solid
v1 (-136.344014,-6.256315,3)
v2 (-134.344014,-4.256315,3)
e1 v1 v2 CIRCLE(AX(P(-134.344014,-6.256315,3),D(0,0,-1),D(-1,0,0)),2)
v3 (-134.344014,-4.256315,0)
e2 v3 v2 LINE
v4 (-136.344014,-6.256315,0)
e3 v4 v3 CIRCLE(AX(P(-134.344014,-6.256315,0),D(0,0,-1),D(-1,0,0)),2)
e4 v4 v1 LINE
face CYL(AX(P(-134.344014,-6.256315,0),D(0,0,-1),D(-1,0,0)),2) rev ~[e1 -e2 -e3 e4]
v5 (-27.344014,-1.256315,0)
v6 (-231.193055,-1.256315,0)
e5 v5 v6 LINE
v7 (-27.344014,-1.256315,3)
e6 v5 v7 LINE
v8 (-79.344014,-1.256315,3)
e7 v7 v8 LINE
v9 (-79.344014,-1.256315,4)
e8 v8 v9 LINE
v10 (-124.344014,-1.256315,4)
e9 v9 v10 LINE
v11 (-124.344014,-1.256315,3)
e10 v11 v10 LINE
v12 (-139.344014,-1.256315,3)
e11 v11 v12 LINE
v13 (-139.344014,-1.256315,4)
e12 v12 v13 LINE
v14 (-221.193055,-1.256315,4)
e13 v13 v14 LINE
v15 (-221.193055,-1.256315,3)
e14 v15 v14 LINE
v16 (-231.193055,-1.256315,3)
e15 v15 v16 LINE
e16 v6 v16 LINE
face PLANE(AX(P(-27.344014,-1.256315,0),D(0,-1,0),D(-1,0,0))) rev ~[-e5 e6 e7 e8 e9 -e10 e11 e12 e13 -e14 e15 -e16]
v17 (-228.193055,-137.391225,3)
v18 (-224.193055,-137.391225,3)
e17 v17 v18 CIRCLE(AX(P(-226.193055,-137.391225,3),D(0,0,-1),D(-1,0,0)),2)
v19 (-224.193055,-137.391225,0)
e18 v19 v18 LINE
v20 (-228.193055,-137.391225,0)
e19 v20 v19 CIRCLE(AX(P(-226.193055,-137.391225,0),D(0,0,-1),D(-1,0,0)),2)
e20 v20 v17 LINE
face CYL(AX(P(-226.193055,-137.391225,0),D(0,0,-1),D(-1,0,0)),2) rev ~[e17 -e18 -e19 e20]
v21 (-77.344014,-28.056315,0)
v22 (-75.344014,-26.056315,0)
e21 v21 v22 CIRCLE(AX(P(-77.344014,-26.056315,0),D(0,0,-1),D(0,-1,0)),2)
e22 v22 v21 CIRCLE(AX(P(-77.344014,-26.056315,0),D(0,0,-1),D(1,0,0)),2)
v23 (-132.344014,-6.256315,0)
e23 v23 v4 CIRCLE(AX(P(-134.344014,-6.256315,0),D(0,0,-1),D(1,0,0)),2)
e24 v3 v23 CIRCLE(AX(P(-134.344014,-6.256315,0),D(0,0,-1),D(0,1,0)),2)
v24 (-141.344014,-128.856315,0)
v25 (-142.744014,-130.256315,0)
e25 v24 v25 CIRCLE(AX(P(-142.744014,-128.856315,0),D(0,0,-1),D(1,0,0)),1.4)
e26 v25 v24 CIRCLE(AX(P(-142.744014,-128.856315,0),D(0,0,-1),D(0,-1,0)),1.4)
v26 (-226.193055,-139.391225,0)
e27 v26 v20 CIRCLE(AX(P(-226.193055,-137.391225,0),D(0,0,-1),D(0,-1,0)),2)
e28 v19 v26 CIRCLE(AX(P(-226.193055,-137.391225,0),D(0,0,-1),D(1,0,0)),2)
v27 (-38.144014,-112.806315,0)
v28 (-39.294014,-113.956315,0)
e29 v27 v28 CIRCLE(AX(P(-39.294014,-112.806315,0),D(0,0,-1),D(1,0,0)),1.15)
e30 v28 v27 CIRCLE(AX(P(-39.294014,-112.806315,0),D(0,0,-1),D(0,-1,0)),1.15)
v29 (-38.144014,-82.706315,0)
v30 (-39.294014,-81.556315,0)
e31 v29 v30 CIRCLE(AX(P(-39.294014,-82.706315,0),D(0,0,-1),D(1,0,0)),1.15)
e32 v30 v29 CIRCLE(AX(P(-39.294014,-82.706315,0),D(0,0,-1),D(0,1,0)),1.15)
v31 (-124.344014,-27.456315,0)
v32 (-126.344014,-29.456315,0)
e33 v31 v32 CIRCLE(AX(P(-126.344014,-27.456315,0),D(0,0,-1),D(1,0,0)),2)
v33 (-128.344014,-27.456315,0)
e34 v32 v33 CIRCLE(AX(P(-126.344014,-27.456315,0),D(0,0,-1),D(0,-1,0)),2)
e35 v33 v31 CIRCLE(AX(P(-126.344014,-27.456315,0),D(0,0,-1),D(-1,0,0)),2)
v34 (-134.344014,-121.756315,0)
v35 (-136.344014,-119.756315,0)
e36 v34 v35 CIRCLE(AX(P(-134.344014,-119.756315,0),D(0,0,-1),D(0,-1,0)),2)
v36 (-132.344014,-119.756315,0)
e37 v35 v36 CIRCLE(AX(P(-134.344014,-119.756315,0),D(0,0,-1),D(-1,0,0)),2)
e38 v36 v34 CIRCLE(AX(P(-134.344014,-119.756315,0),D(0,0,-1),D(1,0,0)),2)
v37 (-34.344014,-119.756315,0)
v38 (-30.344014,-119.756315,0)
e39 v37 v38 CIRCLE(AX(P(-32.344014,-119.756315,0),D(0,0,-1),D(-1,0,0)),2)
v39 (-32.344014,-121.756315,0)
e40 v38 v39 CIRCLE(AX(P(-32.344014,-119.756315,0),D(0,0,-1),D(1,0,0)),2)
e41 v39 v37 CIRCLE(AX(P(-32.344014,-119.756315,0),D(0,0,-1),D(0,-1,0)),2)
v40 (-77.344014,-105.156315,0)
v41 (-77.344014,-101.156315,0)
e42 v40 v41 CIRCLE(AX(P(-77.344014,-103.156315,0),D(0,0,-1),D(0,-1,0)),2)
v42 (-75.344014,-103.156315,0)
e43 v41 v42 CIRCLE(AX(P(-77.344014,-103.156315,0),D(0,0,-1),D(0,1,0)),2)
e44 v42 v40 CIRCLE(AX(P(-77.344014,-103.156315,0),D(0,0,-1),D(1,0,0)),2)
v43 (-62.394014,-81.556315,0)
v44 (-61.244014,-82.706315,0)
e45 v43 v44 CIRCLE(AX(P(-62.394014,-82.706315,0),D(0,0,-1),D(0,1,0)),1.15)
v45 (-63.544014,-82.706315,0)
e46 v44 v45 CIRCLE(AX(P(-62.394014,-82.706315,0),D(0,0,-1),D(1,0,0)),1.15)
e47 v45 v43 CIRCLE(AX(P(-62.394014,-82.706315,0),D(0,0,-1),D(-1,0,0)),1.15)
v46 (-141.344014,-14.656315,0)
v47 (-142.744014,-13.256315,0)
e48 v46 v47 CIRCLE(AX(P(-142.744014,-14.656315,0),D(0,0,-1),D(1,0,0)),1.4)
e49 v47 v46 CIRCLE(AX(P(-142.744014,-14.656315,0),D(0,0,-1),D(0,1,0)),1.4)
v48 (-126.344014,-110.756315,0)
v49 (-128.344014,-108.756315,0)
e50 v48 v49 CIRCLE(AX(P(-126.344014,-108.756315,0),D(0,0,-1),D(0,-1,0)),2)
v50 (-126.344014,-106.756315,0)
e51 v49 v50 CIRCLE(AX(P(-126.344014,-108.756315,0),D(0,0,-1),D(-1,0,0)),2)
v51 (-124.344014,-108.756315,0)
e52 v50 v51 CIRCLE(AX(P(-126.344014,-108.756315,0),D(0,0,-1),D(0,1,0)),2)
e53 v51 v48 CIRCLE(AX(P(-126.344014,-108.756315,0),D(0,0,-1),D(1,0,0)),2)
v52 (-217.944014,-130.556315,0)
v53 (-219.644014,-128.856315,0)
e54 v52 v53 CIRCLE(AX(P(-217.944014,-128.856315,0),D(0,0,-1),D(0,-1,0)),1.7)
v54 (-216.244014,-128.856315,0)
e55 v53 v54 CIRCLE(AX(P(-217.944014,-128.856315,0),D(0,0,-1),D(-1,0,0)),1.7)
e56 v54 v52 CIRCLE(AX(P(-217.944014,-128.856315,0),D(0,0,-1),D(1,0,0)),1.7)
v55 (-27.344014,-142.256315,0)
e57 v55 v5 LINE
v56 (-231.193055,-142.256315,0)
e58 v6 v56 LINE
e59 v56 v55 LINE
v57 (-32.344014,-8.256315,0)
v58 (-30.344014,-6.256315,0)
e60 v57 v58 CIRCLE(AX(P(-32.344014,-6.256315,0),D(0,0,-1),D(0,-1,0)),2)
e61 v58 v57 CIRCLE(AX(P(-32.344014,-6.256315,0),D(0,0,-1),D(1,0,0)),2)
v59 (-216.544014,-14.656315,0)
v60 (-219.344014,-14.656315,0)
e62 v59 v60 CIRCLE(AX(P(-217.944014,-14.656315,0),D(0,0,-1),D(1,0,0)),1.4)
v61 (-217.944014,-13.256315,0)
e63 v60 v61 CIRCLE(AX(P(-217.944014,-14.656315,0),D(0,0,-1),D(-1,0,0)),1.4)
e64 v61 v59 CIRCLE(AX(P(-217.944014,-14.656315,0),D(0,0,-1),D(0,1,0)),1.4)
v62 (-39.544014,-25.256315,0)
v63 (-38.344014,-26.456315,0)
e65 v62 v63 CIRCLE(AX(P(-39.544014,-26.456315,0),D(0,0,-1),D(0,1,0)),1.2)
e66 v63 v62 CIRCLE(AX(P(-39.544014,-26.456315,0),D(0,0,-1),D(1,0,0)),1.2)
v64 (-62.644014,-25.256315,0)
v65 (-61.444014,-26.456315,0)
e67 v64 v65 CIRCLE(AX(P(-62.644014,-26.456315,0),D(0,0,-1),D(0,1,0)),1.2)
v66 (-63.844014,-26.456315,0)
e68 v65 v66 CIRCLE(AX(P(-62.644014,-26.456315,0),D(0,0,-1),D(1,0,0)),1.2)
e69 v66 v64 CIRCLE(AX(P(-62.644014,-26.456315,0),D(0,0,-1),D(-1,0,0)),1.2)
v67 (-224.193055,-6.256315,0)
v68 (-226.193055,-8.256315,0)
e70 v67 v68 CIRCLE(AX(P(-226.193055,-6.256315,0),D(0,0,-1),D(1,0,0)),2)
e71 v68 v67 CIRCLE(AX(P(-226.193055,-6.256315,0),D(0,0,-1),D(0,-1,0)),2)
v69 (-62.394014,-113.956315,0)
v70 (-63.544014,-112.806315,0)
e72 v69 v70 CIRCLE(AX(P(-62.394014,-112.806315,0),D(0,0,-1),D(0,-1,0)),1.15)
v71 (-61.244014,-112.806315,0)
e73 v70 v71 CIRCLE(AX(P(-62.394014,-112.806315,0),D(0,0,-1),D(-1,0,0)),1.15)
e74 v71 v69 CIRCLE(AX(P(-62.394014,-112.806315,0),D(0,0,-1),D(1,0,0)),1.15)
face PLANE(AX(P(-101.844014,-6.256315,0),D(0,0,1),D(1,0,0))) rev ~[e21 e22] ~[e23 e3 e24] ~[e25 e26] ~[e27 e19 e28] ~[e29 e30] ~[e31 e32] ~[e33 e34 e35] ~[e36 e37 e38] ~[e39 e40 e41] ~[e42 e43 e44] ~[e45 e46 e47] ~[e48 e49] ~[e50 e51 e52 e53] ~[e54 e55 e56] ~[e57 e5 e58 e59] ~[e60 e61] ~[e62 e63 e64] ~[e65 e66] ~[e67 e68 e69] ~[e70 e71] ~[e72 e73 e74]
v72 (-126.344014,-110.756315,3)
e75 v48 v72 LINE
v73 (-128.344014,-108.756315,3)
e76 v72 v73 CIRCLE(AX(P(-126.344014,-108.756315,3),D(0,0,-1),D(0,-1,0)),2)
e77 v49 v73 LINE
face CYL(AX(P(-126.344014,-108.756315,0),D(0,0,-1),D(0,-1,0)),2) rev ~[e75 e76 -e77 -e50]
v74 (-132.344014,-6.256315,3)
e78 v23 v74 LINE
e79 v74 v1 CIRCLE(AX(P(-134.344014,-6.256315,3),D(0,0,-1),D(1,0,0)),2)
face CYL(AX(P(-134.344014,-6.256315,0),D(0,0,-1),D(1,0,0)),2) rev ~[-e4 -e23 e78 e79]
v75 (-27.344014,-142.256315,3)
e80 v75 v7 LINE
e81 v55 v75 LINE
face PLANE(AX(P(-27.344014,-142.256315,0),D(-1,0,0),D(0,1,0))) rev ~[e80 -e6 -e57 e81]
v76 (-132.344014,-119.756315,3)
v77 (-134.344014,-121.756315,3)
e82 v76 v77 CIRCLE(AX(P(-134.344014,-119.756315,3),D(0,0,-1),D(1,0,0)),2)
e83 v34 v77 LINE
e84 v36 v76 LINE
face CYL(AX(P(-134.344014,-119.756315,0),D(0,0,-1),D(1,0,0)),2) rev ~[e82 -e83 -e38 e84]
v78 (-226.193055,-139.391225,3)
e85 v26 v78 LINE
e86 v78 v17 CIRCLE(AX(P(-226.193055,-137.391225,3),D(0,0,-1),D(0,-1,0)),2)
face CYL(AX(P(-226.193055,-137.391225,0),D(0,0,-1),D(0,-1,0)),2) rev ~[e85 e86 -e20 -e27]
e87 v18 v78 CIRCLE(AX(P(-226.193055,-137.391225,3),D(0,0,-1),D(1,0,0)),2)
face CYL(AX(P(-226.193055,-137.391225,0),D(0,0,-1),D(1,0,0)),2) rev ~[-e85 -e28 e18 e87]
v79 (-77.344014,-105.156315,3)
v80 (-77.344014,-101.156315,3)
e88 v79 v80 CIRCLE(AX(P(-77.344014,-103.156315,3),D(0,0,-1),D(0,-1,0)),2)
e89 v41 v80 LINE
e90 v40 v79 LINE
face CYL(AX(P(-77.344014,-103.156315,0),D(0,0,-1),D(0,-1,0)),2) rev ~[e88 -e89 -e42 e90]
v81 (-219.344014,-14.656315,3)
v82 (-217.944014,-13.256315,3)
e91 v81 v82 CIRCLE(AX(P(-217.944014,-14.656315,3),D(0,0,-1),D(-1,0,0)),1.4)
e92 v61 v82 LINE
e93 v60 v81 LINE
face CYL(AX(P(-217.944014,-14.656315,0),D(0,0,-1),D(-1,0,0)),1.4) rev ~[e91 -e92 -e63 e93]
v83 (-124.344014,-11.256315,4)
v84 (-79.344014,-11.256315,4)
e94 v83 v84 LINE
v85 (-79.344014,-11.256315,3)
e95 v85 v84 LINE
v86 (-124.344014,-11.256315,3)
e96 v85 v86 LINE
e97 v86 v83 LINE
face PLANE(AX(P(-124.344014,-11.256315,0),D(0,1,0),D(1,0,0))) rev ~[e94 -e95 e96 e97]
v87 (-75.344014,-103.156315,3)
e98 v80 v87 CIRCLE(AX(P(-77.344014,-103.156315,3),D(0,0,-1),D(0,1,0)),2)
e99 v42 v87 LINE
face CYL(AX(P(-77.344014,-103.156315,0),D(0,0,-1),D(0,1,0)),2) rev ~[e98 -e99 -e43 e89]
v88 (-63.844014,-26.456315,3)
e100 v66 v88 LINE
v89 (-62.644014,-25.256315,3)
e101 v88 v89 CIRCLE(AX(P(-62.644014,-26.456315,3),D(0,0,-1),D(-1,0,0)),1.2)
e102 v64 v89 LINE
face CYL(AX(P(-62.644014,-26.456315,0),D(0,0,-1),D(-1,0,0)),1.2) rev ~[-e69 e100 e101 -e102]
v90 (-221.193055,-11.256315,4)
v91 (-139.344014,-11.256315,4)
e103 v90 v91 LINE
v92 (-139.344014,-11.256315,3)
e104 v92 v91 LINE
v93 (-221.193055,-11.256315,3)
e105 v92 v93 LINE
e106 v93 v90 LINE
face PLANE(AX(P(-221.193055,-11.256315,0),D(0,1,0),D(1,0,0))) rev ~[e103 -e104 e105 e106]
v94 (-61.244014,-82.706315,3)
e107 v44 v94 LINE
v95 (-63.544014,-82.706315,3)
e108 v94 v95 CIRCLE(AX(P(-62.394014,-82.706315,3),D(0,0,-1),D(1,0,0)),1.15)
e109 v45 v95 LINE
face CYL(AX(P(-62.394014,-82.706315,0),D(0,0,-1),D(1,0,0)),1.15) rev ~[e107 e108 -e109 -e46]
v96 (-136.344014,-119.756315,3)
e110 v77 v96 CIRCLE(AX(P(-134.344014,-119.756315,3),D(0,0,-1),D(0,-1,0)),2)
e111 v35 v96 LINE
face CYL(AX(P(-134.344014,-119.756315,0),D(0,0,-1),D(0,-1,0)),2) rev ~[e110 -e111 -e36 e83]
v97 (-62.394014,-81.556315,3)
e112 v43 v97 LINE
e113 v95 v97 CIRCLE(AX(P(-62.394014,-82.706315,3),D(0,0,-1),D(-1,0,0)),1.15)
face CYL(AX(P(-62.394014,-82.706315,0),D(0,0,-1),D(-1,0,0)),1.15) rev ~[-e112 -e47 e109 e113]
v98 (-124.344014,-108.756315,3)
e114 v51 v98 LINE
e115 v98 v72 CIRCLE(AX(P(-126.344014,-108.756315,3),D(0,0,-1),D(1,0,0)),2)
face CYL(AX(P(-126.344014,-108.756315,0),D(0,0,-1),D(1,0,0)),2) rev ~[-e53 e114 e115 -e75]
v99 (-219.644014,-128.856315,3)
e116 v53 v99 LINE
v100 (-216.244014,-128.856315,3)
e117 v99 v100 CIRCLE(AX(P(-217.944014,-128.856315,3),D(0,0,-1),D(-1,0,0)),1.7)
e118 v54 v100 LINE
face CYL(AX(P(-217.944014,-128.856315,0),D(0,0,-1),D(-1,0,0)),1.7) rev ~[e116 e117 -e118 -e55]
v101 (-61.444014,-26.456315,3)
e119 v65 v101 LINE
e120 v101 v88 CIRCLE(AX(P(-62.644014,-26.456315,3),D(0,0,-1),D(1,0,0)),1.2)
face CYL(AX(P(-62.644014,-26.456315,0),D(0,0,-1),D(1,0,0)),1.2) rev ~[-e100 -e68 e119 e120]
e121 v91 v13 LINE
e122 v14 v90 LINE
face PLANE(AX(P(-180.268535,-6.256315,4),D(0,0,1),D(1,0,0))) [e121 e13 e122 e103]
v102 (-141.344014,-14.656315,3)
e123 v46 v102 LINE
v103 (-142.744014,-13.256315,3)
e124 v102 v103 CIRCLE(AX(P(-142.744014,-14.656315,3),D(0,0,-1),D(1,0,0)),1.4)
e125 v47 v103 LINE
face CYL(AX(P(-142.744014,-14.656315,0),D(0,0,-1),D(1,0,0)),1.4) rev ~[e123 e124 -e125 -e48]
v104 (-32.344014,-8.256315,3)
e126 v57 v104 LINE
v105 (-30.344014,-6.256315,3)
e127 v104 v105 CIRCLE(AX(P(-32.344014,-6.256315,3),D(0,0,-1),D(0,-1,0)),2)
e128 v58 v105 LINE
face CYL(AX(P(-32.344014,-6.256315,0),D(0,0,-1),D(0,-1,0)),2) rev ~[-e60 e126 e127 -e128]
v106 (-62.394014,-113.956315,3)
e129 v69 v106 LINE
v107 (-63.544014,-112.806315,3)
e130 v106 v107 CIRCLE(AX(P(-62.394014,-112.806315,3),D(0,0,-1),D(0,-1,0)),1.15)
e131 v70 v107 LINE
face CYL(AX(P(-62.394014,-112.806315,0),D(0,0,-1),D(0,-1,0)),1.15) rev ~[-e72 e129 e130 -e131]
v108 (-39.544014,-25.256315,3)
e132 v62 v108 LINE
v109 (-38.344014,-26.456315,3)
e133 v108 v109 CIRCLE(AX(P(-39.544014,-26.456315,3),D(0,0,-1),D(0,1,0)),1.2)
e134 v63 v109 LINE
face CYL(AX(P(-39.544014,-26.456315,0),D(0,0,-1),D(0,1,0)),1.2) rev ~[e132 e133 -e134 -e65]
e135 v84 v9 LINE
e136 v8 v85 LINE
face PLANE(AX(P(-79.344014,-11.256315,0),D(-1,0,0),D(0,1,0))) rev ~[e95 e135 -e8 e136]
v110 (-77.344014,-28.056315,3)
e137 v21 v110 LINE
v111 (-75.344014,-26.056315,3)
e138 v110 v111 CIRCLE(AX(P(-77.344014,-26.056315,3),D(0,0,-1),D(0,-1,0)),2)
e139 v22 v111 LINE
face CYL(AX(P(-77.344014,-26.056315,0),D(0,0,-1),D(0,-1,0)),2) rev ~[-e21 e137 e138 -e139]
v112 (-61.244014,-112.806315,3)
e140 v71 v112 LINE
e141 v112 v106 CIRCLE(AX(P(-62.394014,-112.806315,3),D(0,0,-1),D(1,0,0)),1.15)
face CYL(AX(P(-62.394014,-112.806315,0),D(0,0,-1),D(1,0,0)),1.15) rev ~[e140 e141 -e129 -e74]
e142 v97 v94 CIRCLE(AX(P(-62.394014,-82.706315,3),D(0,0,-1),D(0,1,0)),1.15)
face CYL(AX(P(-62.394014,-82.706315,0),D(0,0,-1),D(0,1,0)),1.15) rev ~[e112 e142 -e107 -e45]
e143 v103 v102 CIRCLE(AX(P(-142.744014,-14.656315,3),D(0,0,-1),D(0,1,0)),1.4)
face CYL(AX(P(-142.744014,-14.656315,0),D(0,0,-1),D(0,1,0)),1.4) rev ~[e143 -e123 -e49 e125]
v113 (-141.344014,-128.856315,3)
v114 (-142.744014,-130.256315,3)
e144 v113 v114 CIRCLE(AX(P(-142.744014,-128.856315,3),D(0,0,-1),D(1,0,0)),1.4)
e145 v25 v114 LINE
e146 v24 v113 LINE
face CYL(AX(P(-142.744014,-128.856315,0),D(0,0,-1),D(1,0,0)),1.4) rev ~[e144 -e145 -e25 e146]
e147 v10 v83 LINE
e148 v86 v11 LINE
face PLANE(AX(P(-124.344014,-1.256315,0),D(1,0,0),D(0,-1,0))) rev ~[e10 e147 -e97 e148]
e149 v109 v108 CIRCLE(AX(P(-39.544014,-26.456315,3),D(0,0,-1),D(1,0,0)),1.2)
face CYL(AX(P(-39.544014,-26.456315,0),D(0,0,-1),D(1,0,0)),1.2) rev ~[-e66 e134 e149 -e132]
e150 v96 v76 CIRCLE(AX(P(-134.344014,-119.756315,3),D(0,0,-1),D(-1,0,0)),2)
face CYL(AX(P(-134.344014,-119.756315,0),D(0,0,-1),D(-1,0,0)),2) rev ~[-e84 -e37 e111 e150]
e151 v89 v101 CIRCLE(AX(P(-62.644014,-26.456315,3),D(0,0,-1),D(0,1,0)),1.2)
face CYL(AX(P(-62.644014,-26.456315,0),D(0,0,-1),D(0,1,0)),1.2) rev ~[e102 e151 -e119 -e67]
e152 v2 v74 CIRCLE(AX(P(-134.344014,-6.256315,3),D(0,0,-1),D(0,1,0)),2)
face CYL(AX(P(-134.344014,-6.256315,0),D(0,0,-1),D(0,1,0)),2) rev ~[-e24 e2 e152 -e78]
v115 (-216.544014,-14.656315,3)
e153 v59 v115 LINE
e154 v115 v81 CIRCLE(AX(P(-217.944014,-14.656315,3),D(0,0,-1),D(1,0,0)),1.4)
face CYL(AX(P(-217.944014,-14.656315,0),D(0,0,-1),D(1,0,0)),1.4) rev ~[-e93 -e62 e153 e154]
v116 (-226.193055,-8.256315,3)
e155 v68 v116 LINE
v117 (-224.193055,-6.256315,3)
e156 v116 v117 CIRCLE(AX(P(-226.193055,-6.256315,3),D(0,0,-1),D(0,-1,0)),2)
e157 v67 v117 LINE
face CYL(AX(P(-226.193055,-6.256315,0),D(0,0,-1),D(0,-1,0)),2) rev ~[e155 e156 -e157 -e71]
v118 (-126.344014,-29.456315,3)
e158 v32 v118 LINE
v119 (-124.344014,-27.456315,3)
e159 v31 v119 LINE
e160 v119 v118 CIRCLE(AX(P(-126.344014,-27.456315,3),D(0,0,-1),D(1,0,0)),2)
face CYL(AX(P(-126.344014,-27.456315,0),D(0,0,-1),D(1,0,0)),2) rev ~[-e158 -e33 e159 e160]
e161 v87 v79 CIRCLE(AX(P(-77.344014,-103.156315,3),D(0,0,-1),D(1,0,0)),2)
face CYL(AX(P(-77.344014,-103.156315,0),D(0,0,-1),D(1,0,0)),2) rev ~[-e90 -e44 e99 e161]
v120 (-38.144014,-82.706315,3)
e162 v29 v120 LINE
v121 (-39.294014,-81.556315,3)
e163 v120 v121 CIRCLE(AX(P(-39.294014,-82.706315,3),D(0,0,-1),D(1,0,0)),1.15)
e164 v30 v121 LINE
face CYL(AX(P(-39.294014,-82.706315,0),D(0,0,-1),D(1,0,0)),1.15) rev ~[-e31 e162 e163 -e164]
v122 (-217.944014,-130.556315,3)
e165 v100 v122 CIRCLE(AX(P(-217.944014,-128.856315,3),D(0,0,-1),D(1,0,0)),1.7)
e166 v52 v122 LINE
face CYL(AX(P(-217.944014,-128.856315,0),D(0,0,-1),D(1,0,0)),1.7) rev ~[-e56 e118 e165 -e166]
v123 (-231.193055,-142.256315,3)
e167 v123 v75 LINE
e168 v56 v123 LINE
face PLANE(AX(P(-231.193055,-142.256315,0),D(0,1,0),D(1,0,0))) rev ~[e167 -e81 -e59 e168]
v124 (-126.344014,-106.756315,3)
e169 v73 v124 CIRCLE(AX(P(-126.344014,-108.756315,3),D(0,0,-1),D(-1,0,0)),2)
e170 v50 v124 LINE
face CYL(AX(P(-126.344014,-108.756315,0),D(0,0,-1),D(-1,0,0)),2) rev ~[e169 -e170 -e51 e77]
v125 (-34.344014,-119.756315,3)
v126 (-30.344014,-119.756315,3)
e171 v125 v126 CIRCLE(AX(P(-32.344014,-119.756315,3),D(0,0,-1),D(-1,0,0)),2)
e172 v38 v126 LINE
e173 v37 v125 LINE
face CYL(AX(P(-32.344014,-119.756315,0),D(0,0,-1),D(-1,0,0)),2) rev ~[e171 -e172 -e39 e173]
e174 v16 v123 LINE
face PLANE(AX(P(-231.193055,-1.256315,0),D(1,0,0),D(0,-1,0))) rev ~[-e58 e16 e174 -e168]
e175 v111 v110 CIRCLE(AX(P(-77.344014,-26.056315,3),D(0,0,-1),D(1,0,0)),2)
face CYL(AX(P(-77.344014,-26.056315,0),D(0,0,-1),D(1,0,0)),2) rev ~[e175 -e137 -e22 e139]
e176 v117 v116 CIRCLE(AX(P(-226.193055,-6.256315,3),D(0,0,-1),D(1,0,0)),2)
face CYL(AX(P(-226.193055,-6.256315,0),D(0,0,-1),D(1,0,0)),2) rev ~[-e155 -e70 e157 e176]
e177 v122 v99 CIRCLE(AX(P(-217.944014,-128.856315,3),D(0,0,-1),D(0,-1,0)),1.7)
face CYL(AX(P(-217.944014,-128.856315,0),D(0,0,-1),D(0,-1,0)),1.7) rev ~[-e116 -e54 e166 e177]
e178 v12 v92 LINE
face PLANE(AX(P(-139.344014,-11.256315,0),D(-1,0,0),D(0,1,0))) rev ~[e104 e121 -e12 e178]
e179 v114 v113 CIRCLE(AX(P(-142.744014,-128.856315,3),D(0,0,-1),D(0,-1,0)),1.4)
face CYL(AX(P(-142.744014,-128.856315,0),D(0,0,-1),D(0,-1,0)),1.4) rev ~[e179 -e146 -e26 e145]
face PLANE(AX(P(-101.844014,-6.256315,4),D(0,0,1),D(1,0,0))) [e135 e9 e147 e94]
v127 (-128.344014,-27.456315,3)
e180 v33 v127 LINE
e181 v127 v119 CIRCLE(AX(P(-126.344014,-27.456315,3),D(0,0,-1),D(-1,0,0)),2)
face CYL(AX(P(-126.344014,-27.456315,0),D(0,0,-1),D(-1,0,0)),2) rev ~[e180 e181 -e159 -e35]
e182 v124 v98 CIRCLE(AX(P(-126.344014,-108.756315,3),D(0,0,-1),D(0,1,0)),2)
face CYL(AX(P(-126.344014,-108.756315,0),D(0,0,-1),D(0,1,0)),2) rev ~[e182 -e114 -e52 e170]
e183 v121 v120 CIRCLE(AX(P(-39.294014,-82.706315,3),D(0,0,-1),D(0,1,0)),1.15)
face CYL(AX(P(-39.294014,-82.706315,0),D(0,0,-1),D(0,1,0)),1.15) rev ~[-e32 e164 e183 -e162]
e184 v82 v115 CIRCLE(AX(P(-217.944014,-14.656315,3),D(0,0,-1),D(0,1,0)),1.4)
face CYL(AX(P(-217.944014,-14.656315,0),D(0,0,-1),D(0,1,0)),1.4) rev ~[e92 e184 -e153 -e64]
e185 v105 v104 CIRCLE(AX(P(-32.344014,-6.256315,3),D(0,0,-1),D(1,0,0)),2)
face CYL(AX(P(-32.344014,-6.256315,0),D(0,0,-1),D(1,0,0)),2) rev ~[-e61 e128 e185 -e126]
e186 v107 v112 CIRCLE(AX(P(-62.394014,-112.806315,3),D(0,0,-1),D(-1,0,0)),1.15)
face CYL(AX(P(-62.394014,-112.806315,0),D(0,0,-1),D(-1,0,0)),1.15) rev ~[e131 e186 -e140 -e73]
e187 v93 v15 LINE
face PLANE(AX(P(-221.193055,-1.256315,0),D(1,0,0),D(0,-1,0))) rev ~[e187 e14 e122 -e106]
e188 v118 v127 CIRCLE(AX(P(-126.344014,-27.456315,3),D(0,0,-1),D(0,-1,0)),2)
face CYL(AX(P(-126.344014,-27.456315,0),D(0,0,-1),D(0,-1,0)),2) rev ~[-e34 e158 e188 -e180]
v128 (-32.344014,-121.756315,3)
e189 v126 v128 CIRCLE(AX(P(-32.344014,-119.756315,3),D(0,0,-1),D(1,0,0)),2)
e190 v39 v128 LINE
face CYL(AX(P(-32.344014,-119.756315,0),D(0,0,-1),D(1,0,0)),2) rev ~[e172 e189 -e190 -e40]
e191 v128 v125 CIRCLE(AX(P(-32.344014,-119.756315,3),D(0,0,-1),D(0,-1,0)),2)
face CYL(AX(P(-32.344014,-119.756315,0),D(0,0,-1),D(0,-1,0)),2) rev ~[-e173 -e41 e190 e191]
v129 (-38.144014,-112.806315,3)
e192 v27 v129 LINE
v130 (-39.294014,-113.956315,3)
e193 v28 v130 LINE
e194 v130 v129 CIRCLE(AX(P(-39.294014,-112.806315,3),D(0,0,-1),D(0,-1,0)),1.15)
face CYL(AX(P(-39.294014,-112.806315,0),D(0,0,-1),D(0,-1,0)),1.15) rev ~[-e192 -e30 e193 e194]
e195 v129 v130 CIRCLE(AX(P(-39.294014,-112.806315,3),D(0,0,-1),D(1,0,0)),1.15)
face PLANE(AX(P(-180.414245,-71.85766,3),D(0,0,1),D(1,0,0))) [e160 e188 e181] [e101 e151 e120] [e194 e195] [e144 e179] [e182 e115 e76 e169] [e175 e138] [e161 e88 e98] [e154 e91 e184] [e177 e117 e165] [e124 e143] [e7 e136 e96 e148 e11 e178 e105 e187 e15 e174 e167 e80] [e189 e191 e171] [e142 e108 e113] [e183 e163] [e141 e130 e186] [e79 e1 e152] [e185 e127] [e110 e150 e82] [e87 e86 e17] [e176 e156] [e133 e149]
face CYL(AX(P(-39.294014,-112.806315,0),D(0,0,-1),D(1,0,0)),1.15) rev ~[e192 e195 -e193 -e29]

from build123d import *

# Parameters (mm, degrees)
F0_W     = 15
F0_H     = 10
F1_DEPTH = 3
F2_DEPTH = 4
F3_DEPTH = 4


# Not quite as in the source:
# - a feature names something its author has since deleted; it is built from what else it names


with BuildPart() as f1:
    # F0 (on Top) → F1 (new body)
    with BuildSketch(Plane.XY):
        with BuildLine():
            Line((-139.3440142274, -114.756315279), (-139.3440142274, -14.656315279))
            Line((-139.3440142274, -14.656315279), (-141.3440142274, -14.656315279))
            ThreePointArc((-141.3440142274, -14.656315279), (-143.7339637211, -15.6462647727), (-142.7440142274, -13.256315279))
            Line((-142.7440142274, -13.256315279), (-142.7440142274, -11.256315279))
            Line((-142.7440142274, -11.256315279), (-217.9440142274, -11.256315279))
            Line((-217.9440142274, -11.256315279), (-217.9440142274, -13.256315279))
            ThreePointArc((-217.9440142274, -13.256315279), (-216.9540647337, -13.6663657853), (-216.5440142274, -14.656315279))
            ThreePointArc((-216.5440142274, -14.656315279), (-217.9440142274, -16.056315279), (-219.3440142274, -14.656315279))
            Line((-219.3440142274, -14.656315279), (-221.1930548072, -14.656315279))
            Line((-221.1930548072, -14.656315279), (-221.1930548072, -128.856315279))
            Line((-221.1930548072, -128.856315279), (-219.6440142274, -128.856315279))
            ThreePointArc((-219.6440142274, -128.856315279), (-217.9440142274, -127.156315279), (-216.2440142274, -128.856315279))
            ThreePointArc((-216.2440142274, -128.856315279), (-216.7419326994, -130.058396807), (-217.9440142274, -130.556315279))
            Line((-217.9440142274, -130.556315279), (-217.9440142274, -132.256315279))
            Line((-217.9440142274, -132.256315279), (-142.7440142274, -132.256315279))
            Line((-142.7440142274, -132.256315279), (-142.7440142274, -130.256315279))
            ThreePointArc((-142.7440142274, -130.256315279), (-143.7339637211, -127.8663657853), (-141.3440142274, -128.856315279))
            Line((-141.3440142274, -128.856315279), (-139.3440142274, -128.856315279))
            Line((-139.3440142274, -128.856315279), (-139.3440142274, -124.756315279))
            Line((-139.3440142274, -124.756315279), (-139.3440142274, -119.756315279))
            Line((-139.3440142274, -119.756315279), (-139.3440142274, -114.756315279))
        make_face()
        with BuildLine():
            Line((-126.5440142274, -11.256315279), (-129.3440142274, -11.256315279))
            Line((-129.3440142274, -11.256315279), (-129.3440142274, -14.056315279))
            Line((-129.3440142274, -14.056315279), (-129.3440142274, -27.456315279))
            Line((-129.3440142274, -27.456315279), (-128.3440142274, -27.456315279))
            ThreePointArc((-128.3440142274, -27.456315279), (-126.3440142274, -25.456315279), (-124.3440142274, -27.456315279))
            ThreePointArc((-124.3440142274, -27.456315279), (-124.929800665, -28.8705288414), (-126.3440142274, -29.456315279))
            Line((-126.3440142274, -29.456315279), (-126.3440142274, -106.756315279))
            ThreePointArc((-126.3440142274, -106.756315279), (-124.929800665, -107.3421017166), (-124.3440142274, -108.756315279))
            ThreePointArc((-124.3440142274, -108.756315279), (-124.929800665, -110.1705288414), (-126.3440142274, -110.756315279))
            Line((-126.3440142274, -110.756315279), (-126.3440142274, -114.756315279))
            Line((-126.3440142274, -114.756315279), (-77.3440142274, -114.756315279))
            Line((-77.3440142274, -114.756315279), (-77.3440142274, -105.156315279))
            ThreePointArc((-77.3440142274, -105.156315279), (-79.3440142274, -103.156315279), (-77.3440142274, -101.156315279))
            Line((-77.3440142274, -101.156315279), (-77.3440142274, -28.056315279))
            ThreePointArc((-77.3440142274, -28.056315279), (-78.7582277898, -24.6421017166), (-75.3440142274, -26.056315279))
            Line((-75.3440142274, -26.056315279), (-74.3440142274, -26.056315279))
            Line((-74.3440142274, -26.056315279), (-74.3440142274, -14.256315279))
            Line((-74.3440142274, -14.256315279), (-74.3440142274, -11.256315279))
            Line((-74.3440142274, -11.256315279), (-77.3440142274, -11.256315279))
            Line((-77.3440142274, -11.256315279), (-79.3440142274, -11.256315279))
            Line((-79.3440142274, -11.256315279), (-124.3440142274, -11.256315279))
            Line((-124.3440142274, -11.256315279), (-126.3440142274, -11.256315279))
            Line((-126.3440142274, -11.256315279), (-126.5440142274, -11.256315279))
        make_face()
        Polygon((-32.3440142274, -11.256315279), (-74.3440142274, -11.256315279), (-74.3440142274, -14.256315279), (-74.3440142274, -26.056315279), (-74.3440142274, -103.156315279), (-74.3440142274, -111.906315279), (-74.3440142274, -114.756315279), (-64.3440142274, -114.756315279), (-64.3440142274, -112.806315279), (-64.3440142274, -82.706315279), (-64.3440142274, -80.756315279), (-62.3940142274, -80.756315279), (-57.3440142274, -80.756315279), (-57.3440142274, -70.756315279), (-42.3440142274, -70.756315279), (-42.3440142274, -80.756315279), (-39.2940142274, -80.756315279), (-37.3440142274, -80.756315279), (-37.3440142274, -82.706315279), (-37.3440142274, -112.806315279), (-37.3440142274, -114.756315279), (-27.3440142274, -114.756315279), (-27.3440142274, -14.656315279), (-27.3440142274, -11.256315279), align=None)
        Polygon((-62.5940142274, -60.756315279), (-64.3440142274, -60.756315279), (-64.3440142274, -59.006315279), (-64.3440142274, -26.456315279), (-64.3440142274, -24.756315279), (-62.6440142274, -24.756315279), (-39.5440142274, -24.756315279), (-37.8440142274, -24.756315279), (-37.8440142274, -26.456315279), (-37.8440142274, -59.006315279), (-37.8440142274, -60.756315279), (-39.5940142274, -60.756315279), align=None, mode=Mode.SUBTRACT)
        Polygon((-37.3440142274, -124.756315279), (-129.3440142274, -124.756315279), (-129.3440142274, -142.256315279), (-27.3440142274, -142.256315279), (-27.3440142274, -124.756315279), (-32.3440142274, -124.756315279), align=None)
        with BuildLine():
            Line((-221.1930548072, -6.256315279), (-221.1930548072, -1.256315279))
            Line((-221.1930548072, -1.256315279), (-231.1930548072, -1.256315279))
            Line((-231.1930548072, -1.256315279), (-231.1930548072, -132.256315279))
            Line((-231.1930548072, -132.256315279), (-221.1930548072, -132.256315279))
            Line((-221.1930548072, -132.256315279), (-221.1930548072, -128.856315279))
            Line((-221.1930548072, -128.856315279), (-221.1930548072, -14.656315279))
            Line((-221.1930548072, -14.656315279), (-221.1930548072, -11.256315279))
            Line((-221.1930548072, -11.256315279), (-226.1930548072, -11.256315279))
            Line((-226.1930548072, -11.256315279), (-226.1930548072, -8.256315279))
            ThreePointArc((-226.1930548072, -8.256315279), (-227.6072683696, -4.8421017166), (-224.1930548072, -6.256315279))
            Line((-224.1930548072, -6.256315279), (-221.1930548072, -6.256315279))
        make_face()
        Polygon((-139.1930548072, -11.256315279), (-139.3440142274, -11.256315279), (-139.3440142274, -14.656315279), (-139.3440142274, -114.756315279), (-129.3440142274, -114.756315279), (-129.3440142274, -111.756315279), (-129.3440142274, -108.756315279), (-129.3440142274, -27.956315279), (-129.3440142274, -27.456315279), (-129.3440142274, -14.056315279), (-129.3440142274, -11.256315279), align=None)
        with BuildLine():
            Line((-64.3440142274, -59.006315279), (-64.3440142274, -60.756315279))
            Line((-64.3440142274, -60.756315279), (-62.5940142274, -60.756315279))
            Line((-62.5940142274, -60.756315279), (-39.5940142274, -60.756315279))
            Line((-39.5940142274, -60.756315279), (-37.8440142274, -60.756315279))
            Line((-37.8440142274, -60.756315279), (-37.8440142274, -59.006315279))
            Line((-37.8440142274, -59.006315279), (-37.8440142274, -26.456315279))
            Line((-37.8440142274, -26.456315279), (-38.3440142274, -26.456315279))
            ThreePointArc((-38.3440142274, -26.456315279), (-40.3925423648, -27.3048434164), (-39.5440142274, -25.256315279))
            Line((-39.5440142274, -25.256315279), (-39.5440142274, -24.756315279))
            Line((-39.5440142274, -24.756315279), (-62.6440142274, -24.756315279))
            Line((-62.6440142274, -24.756315279), (-62.6440142274, -25.256315279))
            ThreePointArc((-62.6440142274, -25.256315279), (-61.79548609, -25.6077871416), (-61.4440142274, -26.456315279))
            ThreePointArc((-61.4440142274, -26.456315279), (-62.6440142274, -27.656315279), (-63.8440142274, -26.456315279))
            Line((-63.8440142274, -26.456315279), (-64.3440142274, -26.456315279))
            Line((-64.3440142274, -26.456315279), (-64.3440142274, -59.006315279))
        make_face()
        Polygon((-126.3440142274, -114.756315279), (-129.3440142274, -114.756315279), (-129.3440142274, -124.756315279), (-37.3440142274, -124.756315279), (-37.3440142274, -119.756315279), (-37.3440142274, -114.756315279), (-39.2940142274, -114.756315279), (-62.3940142274, -114.756315279), (-64.3440142274, -114.756315279), (-74.3440142274, -114.756315279), (-77.1940142274, -114.756315279), (-77.3440142274, -114.756315279), align=None)
        with BuildLine():
            Line((-62.3940142274, -114.756315279), (-39.2940142274, -114.756315279))
            Line((-39.2940142274, -114.756315279), (-39.2940142274, -113.956315279))
            ThreePointArc((-39.2940142274, -113.956315279), (-40.1071870258, -111.9931424806), (-38.1440142274, -112.806315279))
            Line((-38.1440142274, -112.806315279), (-37.3440142274, -112.806315279))
            Line((-37.3440142274, -112.806315279), (-37.3440142274, -82.706315279))
            Line((-37.3440142274, -82.706315279), (-38.1440142274, -82.706315279))
            ThreePointArc((-38.1440142274, -82.706315279), (-40.1071870258, -83.5194880774), (-39.2940142274, -81.556315279))
            Line((-39.2940142274, -81.556315279), (-39.2940142274, -80.756315279))
            Line((-39.2940142274, -80.756315279), (-42.3440142274, -80.756315279))
            Line((-42.3440142274, -80.756315279), (-57.3440142274, -80.756315279))
            Line((-57.3440142274, -80.756315279), (-62.3940142274, -80.756315279))
            Line((-62.3940142274, -80.756315279), (-62.3940142274, -81.556315279))
            ThreePointArc((-62.3940142274, -81.556315279), (-61.580841429, -81.8931424806), (-61.2440142274, -82.706315279))
            ThreePointArc((-61.2440142274, -82.706315279), (-62.3940142274, -83.856315279), (-63.5440142274, -82.706315279))
            Line((-63.5440142274, -82.706315279), (-64.3440142274, -82.706315279))
            Line((-64.3440142274, -82.706315279), (-64.3440142274, -112.806315279))
            Line((-64.3440142274, -112.806315279), (-63.5440142274, -112.806315279))
            ThreePointArc((-63.5440142274, -112.806315279), (-62.3940142274, -111.656315279), (-61.2440142274, -112.806315279))
            ThreePointArc((-61.2440142274, -112.806315279), (-61.580841429, -113.6194880774), (-62.3940142274, -113.956315279))
            Line((-62.3940142274, -113.956315279), (-62.3940142274, -114.756315279))
        make_face()
        Polygon((-217.9440142274, -132.256315279), (-221.1930548072, -132.256315279), (-221.1930548072, -142.256315279), (-139.1930548072, -142.256315279), (-139.3440142274, -132.256315279), (-142.7440142274, -132.256315279), align=None)
        Polygon((-139.3440142274, -6.256315279), (-139.3440142274, -1.256315279), (-221.1930548072, -1.256315279), (-221.1930548072, -6.256315279), (-221.1930548072, -11.256315279), (-217.9440142274, -11.256315279), (-142.7440142274, -11.256315279), (-139.3440142274, -11.256315279), align=None)
        with BuildLine():
            Line((-79.3440142274, -1.256315279), (-79.3440142274, -11.256315279))
            Line((-79.3440142274, -11.256315279), (-77.3440142274, -11.256315279))
            Line((-77.3440142274, -11.256315279), (-74.3440142274, -11.256315279))
            Line((-74.3440142274, -11.256315279), (-32.3440142274, -11.256315279))
            Line((-32.3440142274, -11.256315279), (-32.3440142274, -8.256315279))
            ThreePointArc((-32.3440142274, -8.256315279), (-33.7582277898, -4.8421017166), (-30.3440142274, -6.256315279))
            Line((-30.3440142274, -6.256315279), (-27.3440142274, -6.256315279))
            Line((-27.3440142274, -6.256315279), (-27.3440142274, -1.256315279))
            Line((-27.3440142274, -1.256315279), (-79.3440142274, -1.256315279))
        make_face()
        Polygon((-83.3440142274, -1.256315279), (-124.3440142274, -1.256315279), (-124.3440142274, -11.256315279), (-79.3440142274, -11.256315279), (-79.3440142274, -1.256315279), align=None)
        with BuildLine():
            Line((-128.3440142274, -27.456315279), (-129.3440142274, -27.456315279))
            Line((-129.3440142274, -27.456315279), (-129.3440142274, -27.956315279))
            Line((-129.3440142274, -27.956315279), (-129.3440142274, -108.756315279))
            Line((-129.3440142274, -108.756315279), (-128.3440142274, -108.756315279))
            ThreePointArc((-128.3440142274, -108.756315279), (-127.7582277898, -107.3421017166), (-126.3440142274, -106.756315279))
            Line((-126.3440142274, -106.756315279), (-126.3440142274, -29.456315279))
            ThreePointArc((-126.3440142274, -29.456315279), (-127.7582277898, -28.8705288414), (-128.3440142274, -27.456315279))
        make_face()
        with BuildLine():
            Line((-74.3440142274, -103.156315279), (-74.3440142274, -26.056315279))
            Line((-74.3440142274, -26.056315279), (-75.3440142274, -26.056315279))
            ThreePointArc((-75.3440142274, -26.056315279), (-75.929800665, -27.4705288414), (-77.3440142274, -28.056315279))
            Line((-77.3440142274, -28.056315279), (-77.3440142274, -101.156315279))
            ThreePointArc((-77.3440142274, -101.156315279), (-75.929800665, -101.7421017166), (-75.3440142274, -103.156315279))
            Line((-75.3440142274, -103.156315279), (-74.3440142274, -103.156315279))
        make_face()
        Polygon((-129.3440142274, -142.256315279), (-129.3440142274, -124.756315279), (-134.3440142274, -124.756315279), (-139.1930548072, -124.756315279), (-139.3440142274, -124.756315279), (-139.3440142274, -128.856315279), (-139.3440142274, -132.256315279), (-139.1930548072, -142.256315279), align=None)
        with Locations((-49.8440142274, -75.756315279)):
            Rectangle(F0_W, F0_H)
        with BuildLine():
            Line((-221.1930548072, -132.256315279), (-231.1930548072, -132.256315279))
            Line((-231.1930548072, -132.256315279), (-231.1930548072, -137.3912245035))
            Line((-231.1930548072, -137.3912245035), (-228.1930548072, -137.3912245035))
            ThreePointArc((-228.1930548072, -137.3912245035), (-226.1930548072, -135.3912245035), (-224.1930548072, -137.3912245035))
            ThreePointArc((-224.1930548072, -137.3912245035), (-224.7788412448, -138.8054380659), (-226.1930548072, -139.3912245035))
            Line((-226.1930548072, -139.3912245035), (-226.1930548072, -142.256315279))
            Line((-226.1930548072, -142.256315279), (-221.1930548072, -142.256315279))
            Line((-221.1930548072, -142.256315279), (-221.1930548072, -132.256315279))
        make_face()
        with BuildLine():
            Line((-129.3440142274, -1.256315279), (-134.3440142274, -1.256315279))
            Line((-134.3440142274, -1.256315279), (-134.3440142274, -4.256315279))
            ThreePointArc((-134.3440142274, -4.256315279), (-132.929800665, -4.8421017166), (-132.3440142274, -6.256315279))
            ThreePointArc((-132.3440142274, -6.256315279), (-134.3440142274, -8.256315279), (-136.3440142274, -6.256315279))
            Line((-136.3440142274, -6.256315279), (-139.3440142274, -6.256315279))
            Line((-139.3440142274, -6.256315279), (-139.3440142274, -11.256315279))
            Line((-139.3440142274, -11.256315279), (-139.1930548072, -11.256315279))
            Line((-139.1930548072, -11.256315279), (-129.3440142274, -11.256315279))
            Line((-129.3440142274, -11.256315279), (-129.3440142274, -1.256315279))
        make_face()
        with BuildLine():
            Line((-129.3440142274, -114.756315279), (-139.3440142274, -114.756315279))
            Line((-139.3440142274, -114.756315279), (-139.3440142274, -119.756315279))
            Line((-139.3440142274, -119.756315279), (-136.3440142274, -119.756315279))
            ThreePointArc((-136.3440142274, -119.756315279), (-134.3440142274, -117.756315279), (-132.3440142274, -119.756315279))
            ThreePointArc((-132.3440142274, -119.756315279), (-132.929800665, -121.1705288414), (-134.3440142274, -121.756315279))
            Line((-134.3440142274, -121.756315279), (-134.3440142274, -124.756315279))
            Line((-134.3440142274, -124.756315279), (-129.3440142274, -124.756315279))
            Line((-129.3440142274, -124.756315279), (-129.3440142274, -114.756315279))
        make_face()
        with BuildLine():
            Line((-32.3440142274, -121.756315279), (-32.3440142274, -124.756315279))
            Line((-32.3440142274, -124.756315279), (-27.3440142274, -124.756315279))
            Line((-27.3440142274, -124.756315279), (-27.3440142274, -114.756315279))
            Line((-27.3440142274, -114.756315279), (-37.3440142274, -114.756315279))
            Line((-37.3440142274, -114.756315279), (-37.3440142274, -119.756315279))
            Line((-37.3440142274, -119.756315279), (-34.3440142274, -119.756315279))
            ThreePointArc((-34.3440142274, -119.756315279), (-32.3440142274, -117.756315279), (-30.3440142274, -119.756315279))
            ThreePointArc((-30.3440142274, -119.756315279), (-30.929800665, -121.1705288414), (-32.3440142274, -121.756315279))
        make_face()
        Polygon((-124.3440142274, -1.256315279), (-129.3440142274, -1.256315279), (-129.3440142274, -11.256315279), (-126.5440142274, -11.256315279), (-126.3440142274, -11.256315279), (-124.3440142274, -11.256315279), align=None)
        with BuildLine():
            Line((-77.3440142274, -105.156315279), (-77.3440142274, -114.756315279))
            Line((-77.3440142274, -114.756315279), (-77.1940142274, -114.756315279))
            Line((-77.1940142274, -114.756315279), (-74.3440142274, -114.756315279))
            Line((-74.3440142274, -114.756315279), (-74.3440142274, -111.906315279))
            Line((-74.3440142274, -111.906315279), (-74.3440142274, -103.156315279))
            Line((-74.3440142274, -103.156315279), (-75.3440142274, -103.156315279))
            ThreePointArc((-75.3440142274, -103.156315279), (-75.929800665, -104.5705288414), (-77.3440142274, -105.156315279))
        make_face()
        with BuildLine():
            Line((-134.3440142274, -1.256315279), (-139.3440142274, -1.256315279))
            Line((-139.3440142274, -1.256315279), (-139.3440142274, -6.256315279))
            Line((-139.3440142274, -6.256315279), (-136.3440142274, -6.256315279))
            ThreePointArc((-136.3440142274, -6.256315279), (-135.7582277898, -4.8421017166), (-134.3440142274, -4.256315279))
            Line((-134.3440142274, -4.256315279), (-134.3440142274, -1.256315279))
        make_face()
        with BuildLine():
            Line((-221.1930548072, -11.256315279), (-221.1930548072, -6.256315279))
            Line((-221.1930548072, -6.256315279), (-224.1930548072, -6.256315279))
            ThreePointArc((-224.1930548072, -6.256315279), (-224.7788412448, -7.6705288414), (-226.1930548072, -8.256315279))
            Line((-226.1930548072, -8.256315279), (-226.1930548072, -11.256315279))
            Line((-226.1930548072, -11.256315279), (-221.1930548072, -11.256315279))
        make_face()
        with BuildLine():
            Line((-136.3440142274, -119.756315279), (-139.3440142274, -119.756315279))
            Line((-139.3440142274, -119.756315279), (-139.3440142274, -124.756315279))
            Line((-139.3440142274, -124.756315279), (-139.1930548072, -124.756315279))
            Line((-139.1930548072, -124.756315279), (-134.3440142274, -124.756315279))
            Line((-134.3440142274, -124.756315279), (-134.3440142274, -121.756315279))
            ThreePointArc((-134.3440142274, -121.756315279), (-135.7582277898, -121.1705288414), (-136.3440142274, -119.756315279))
        make_face()
        with BuildLine():
            Line((-27.3440142274, -11.256315279), (-27.3440142274, -6.256315279))
            Line((-27.3440142274, -6.256315279), (-30.3440142274, -6.256315279))
            ThreePointArc((-30.3440142274, -6.256315279), (-30.929800665, -7.6705288414), (-32.3440142274, -8.256315279))
            Line((-32.3440142274, -8.256315279), (-32.3440142274, -11.256315279))
            Line((-32.3440142274, -11.256315279), (-27.3440142274, -11.256315279))
        make_face()
        with BuildLine():
            Line((-37.3440142274, -119.756315279), (-37.3440142274, -124.756315279))
            Line((-37.3440142274, -124.756315279), (-32.3440142274, -124.756315279))
            Line((-32.3440142274, -124.756315279), (-32.3440142274, -121.756315279))
            ThreePointArc((-32.3440142274, -121.756315279), (-33.7582277898, -121.1705288414), (-34.3440142274, -119.756315279))
            Line((-34.3440142274, -119.756315279), (-37.3440142274, -119.756315279))
        make_face()
        with BuildLine():
            Line((-228.1930548072, -137.3912245035), (-231.1930548072, -137.3912245035))
            Line((-231.1930548072, -137.3912245035), (-231.1930548072, -142.256315279))
            Line((-231.1930548072, -142.256315279), (-226.1930548072, -142.256315279))
            Line((-226.1930548072, -142.256315279), (-226.1930548072, -139.3912245035))
            ThreePointArc((-226.1930548072, -139.3912245035), (-227.6072683696, -138.8054380659), (-228.1930548072, -137.3912245035))
        make_face()
        with BuildLine():
            Line((-129.3440142274, -111.756315279), (-129.3440142274, -114.756315279))
            Line((-129.3440142274, -114.756315279), (-126.3440142274, -114.756315279))
            Line((-126.3440142274, -114.756315279), (-126.3440142274, -110.756315279))
            ThreePointArc((-126.3440142274, -110.756315279), (-127.7582277898, -110.1705288414), (-128.3440142274, -108.756315279))
            Line((-128.3440142274, -108.756315279), (-129.3440142274, -108.756315279))
            Line((-129.3440142274, -108.756315279), (-129.3440142274, -111.756315279))
        make_face()
        with BuildLine():
            Line((-139.3440142274, -14.656315279), (-139.3440142274, -11.256315279))
            Line((-139.3440142274, -11.256315279), (-142.7440142274, -11.256315279))
            Line((-142.7440142274, -11.256315279), (-142.7440142274, -13.256315279))
            ThreePointArc((-142.7440142274, -13.256315279), (-141.7540647337, -13.6663657853), (-141.3440142274, -14.656315279))
            Line((-141.3440142274, -14.656315279), (-139.3440142274, -14.656315279))
        make_face()
        with BuildLine():
            Line((-142.7440142274, -130.256315279), (-142.7440142274, -132.256315279))
            Line((-142.7440142274, -132.256315279), (-139.3440142274, -132.256315279))
            Line((-139.3440142274, -132.256315279), (-139.3440142274, -128.856315279))
            Line((-139.3440142274, -128.856315279), (-141.3440142274, -128.856315279))
            ThreePointArc((-141.3440142274, -128.856315279), (-141.7540647337, -129.8462647727), (-142.7440142274, -130.256315279))
        make_face()
        with BuildLine():
            Line((-217.9440142274, -11.256315279), (-221.1930548072, -11.256315279))
            Line((-221.1930548072, -11.256315279), (-221.1930548072, -14.656315279))
            Line((-221.1930548072, -14.656315279), (-219.3440142274, -14.656315279))
            ThreePointArc((-219.3440142274, -14.656315279), (-218.9339637211, -13.6663657853), (-217.9440142274, -13.256315279))
            Line((-217.9440142274, -13.256315279), (-217.9440142274, -11.256315279))
        make_face()
        with BuildLine():
            Line((-221.1930548072, -128.856315279), (-221.1930548072, -132.256315279))
            Line((-221.1930548072, -132.256315279), (-217.9440142274, -132.256315279))
            Line((-217.9440142274, -132.256315279), (-217.9440142274, -130.556315279))
            ThreePointArc((-217.9440142274, -130.556315279), (-219.1460957554, -130.058396807), (-219.6440142274, -128.856315279))
            Line((-219.6440142274, -128.856315279), (-221.1930548072, -128.856315279))
        make_face()
        with BuildLine():
            Line((-39.2940142274, -114.756315279), (-37.3440142274, -114.756315279))
            Line((-37.3440142274, -114.756315279), (-37.3440142274, -112.806315279))
            Line((-37.3440142274, -112.806315279), (-38.1440142274, -112.806315279))
            ThreePointArc((-38.1440142274, -112.806315279), (-38.480841429, -113.6194880774), (-39.2940142274, -113.956315279))
            Line((-39.2940142274, -113.956315279), (-39.2940142274, -114.756315279))
        make_face()
        with BuildLine():
            Line((-64.3440142274, -112.806315279), (-64.3440142274, -114.756315279))
            Line((-64.3440142274, -114.756315279), (-62.3940142274, -114.756315279))
            Line((-62.3940142274, -114.756315279), (-62.3940142274, -113.956315279))
            ThreePointArc((-62.3940142274, -113.956315279), (-63.2071870258, -113.6194880774), (-63.5440142274, -112.806315279))
            Line((-63.5440142274, -112.806315279), (-64.3440142274, -112.806315279))
        make_face()
        with BuildLine():
            Line((-38.1440142274, -82.706315279), (-37.3440142274, -82.706315279))
            Line((-37.3440142274, -82.706315279), (-37.3440142274, -80.756315279))
            Line((-37.3440142274, -80.756315279), (-39.2940142274, -80.756315279))
            Line((-39.2940142274, -80.756315279), (-39.2940142274, -81.556315279))
            ThreePointArc((-39.2940142274, -81.556315279), (-38.480841429, -81.8931424806), (-38.1440142274, -82.706315279))
        make_face()
        with BuildLine():
            Line((-64.3440142274, -80.756315279), (-64.3440142274, -82.706315279))
            Line((-64.3440142274, -82.706315279), (-63.5440142274, -82.706315279))
            ThreePointArc((-63.5440142274, -82.706315279), (-63.2071870258, -81.8931424806), (-62.3940142274, -81.556315279))
            Line((-62.3940142274, -81.556315279), (-62.3940142274, -80.756315279))
            Line((-62.3940142274, -80.756315279), (-64.3440142274, -80.756315279))
        make_face()
        with BuildLine():
            Line((-64.3440142274, -24.756315279), (-64.3440142274, -26.456315279))
            Line((-64.3440142274, -26.456315279), (-63.8440142274, -26.456315279))
            ThreePointArc((-63.8440142274, -26.456315279), (-63.4925423648, -25.6077871416), (-62.6440142274, -25.256315279))
            Line((-62.6440142274, -25.256315279), (-62.6440142274, -24.756315279))
            Line((-62.6440142274, -24.756315279), (-64.3440142274, -24.756315279))
        make_face()
        with BuildLine():
            Line((-38.3440142274, -26.456315279), (-37.8440142274, -26.456315279))
            Line((-37.8440142274, -26.456315279), (-37.8440142274, -24.756315279))
            Line((-37.8440142274, -24.756315279), (-39.5440142274, -24.756315279))
            Line((-39.5440142274, -24.756315279), (-39.5440142274, -25.256315279))
            ThreePointArc((-39.5440142274, -25.256315279), (-38.69548609, -25.6077871416), (-38.3440142274, -26.456315279))
        make_face()
    extrude(amount=F1_DEPTH)

    # F0 (on Top) → F2 (join)
    with BuildSketch(Plane.XY):
        Polygon((-139.3440142274, -6.256315279), (-139.3440142274, -1.256315279), (-221.1930548072, -1.256315279), (-221.1930548072, -6.256315279), (-221.1930548072, -11.256315279), (-217.9440142274, -11.256315279), (-142.7440142274, -11.256315279), (-139.3440142274, -11.256315279), align=None)
    extrude(amount=F2_DEPTH)

    # F0 (on Top) → F3 (join)
    with BuildSketch(Plane.XY):
        Polygon((-83.3440142274, -1.256315279), (-124.3440142274, -1.256315279), (-124.3440142274, -11.256315279), (-79.3440142274, -11.256315279), (-79.3440142274, -1.256315279), align=None)
    extrude(amount=F3_DEPTH)


solid = f1.part
